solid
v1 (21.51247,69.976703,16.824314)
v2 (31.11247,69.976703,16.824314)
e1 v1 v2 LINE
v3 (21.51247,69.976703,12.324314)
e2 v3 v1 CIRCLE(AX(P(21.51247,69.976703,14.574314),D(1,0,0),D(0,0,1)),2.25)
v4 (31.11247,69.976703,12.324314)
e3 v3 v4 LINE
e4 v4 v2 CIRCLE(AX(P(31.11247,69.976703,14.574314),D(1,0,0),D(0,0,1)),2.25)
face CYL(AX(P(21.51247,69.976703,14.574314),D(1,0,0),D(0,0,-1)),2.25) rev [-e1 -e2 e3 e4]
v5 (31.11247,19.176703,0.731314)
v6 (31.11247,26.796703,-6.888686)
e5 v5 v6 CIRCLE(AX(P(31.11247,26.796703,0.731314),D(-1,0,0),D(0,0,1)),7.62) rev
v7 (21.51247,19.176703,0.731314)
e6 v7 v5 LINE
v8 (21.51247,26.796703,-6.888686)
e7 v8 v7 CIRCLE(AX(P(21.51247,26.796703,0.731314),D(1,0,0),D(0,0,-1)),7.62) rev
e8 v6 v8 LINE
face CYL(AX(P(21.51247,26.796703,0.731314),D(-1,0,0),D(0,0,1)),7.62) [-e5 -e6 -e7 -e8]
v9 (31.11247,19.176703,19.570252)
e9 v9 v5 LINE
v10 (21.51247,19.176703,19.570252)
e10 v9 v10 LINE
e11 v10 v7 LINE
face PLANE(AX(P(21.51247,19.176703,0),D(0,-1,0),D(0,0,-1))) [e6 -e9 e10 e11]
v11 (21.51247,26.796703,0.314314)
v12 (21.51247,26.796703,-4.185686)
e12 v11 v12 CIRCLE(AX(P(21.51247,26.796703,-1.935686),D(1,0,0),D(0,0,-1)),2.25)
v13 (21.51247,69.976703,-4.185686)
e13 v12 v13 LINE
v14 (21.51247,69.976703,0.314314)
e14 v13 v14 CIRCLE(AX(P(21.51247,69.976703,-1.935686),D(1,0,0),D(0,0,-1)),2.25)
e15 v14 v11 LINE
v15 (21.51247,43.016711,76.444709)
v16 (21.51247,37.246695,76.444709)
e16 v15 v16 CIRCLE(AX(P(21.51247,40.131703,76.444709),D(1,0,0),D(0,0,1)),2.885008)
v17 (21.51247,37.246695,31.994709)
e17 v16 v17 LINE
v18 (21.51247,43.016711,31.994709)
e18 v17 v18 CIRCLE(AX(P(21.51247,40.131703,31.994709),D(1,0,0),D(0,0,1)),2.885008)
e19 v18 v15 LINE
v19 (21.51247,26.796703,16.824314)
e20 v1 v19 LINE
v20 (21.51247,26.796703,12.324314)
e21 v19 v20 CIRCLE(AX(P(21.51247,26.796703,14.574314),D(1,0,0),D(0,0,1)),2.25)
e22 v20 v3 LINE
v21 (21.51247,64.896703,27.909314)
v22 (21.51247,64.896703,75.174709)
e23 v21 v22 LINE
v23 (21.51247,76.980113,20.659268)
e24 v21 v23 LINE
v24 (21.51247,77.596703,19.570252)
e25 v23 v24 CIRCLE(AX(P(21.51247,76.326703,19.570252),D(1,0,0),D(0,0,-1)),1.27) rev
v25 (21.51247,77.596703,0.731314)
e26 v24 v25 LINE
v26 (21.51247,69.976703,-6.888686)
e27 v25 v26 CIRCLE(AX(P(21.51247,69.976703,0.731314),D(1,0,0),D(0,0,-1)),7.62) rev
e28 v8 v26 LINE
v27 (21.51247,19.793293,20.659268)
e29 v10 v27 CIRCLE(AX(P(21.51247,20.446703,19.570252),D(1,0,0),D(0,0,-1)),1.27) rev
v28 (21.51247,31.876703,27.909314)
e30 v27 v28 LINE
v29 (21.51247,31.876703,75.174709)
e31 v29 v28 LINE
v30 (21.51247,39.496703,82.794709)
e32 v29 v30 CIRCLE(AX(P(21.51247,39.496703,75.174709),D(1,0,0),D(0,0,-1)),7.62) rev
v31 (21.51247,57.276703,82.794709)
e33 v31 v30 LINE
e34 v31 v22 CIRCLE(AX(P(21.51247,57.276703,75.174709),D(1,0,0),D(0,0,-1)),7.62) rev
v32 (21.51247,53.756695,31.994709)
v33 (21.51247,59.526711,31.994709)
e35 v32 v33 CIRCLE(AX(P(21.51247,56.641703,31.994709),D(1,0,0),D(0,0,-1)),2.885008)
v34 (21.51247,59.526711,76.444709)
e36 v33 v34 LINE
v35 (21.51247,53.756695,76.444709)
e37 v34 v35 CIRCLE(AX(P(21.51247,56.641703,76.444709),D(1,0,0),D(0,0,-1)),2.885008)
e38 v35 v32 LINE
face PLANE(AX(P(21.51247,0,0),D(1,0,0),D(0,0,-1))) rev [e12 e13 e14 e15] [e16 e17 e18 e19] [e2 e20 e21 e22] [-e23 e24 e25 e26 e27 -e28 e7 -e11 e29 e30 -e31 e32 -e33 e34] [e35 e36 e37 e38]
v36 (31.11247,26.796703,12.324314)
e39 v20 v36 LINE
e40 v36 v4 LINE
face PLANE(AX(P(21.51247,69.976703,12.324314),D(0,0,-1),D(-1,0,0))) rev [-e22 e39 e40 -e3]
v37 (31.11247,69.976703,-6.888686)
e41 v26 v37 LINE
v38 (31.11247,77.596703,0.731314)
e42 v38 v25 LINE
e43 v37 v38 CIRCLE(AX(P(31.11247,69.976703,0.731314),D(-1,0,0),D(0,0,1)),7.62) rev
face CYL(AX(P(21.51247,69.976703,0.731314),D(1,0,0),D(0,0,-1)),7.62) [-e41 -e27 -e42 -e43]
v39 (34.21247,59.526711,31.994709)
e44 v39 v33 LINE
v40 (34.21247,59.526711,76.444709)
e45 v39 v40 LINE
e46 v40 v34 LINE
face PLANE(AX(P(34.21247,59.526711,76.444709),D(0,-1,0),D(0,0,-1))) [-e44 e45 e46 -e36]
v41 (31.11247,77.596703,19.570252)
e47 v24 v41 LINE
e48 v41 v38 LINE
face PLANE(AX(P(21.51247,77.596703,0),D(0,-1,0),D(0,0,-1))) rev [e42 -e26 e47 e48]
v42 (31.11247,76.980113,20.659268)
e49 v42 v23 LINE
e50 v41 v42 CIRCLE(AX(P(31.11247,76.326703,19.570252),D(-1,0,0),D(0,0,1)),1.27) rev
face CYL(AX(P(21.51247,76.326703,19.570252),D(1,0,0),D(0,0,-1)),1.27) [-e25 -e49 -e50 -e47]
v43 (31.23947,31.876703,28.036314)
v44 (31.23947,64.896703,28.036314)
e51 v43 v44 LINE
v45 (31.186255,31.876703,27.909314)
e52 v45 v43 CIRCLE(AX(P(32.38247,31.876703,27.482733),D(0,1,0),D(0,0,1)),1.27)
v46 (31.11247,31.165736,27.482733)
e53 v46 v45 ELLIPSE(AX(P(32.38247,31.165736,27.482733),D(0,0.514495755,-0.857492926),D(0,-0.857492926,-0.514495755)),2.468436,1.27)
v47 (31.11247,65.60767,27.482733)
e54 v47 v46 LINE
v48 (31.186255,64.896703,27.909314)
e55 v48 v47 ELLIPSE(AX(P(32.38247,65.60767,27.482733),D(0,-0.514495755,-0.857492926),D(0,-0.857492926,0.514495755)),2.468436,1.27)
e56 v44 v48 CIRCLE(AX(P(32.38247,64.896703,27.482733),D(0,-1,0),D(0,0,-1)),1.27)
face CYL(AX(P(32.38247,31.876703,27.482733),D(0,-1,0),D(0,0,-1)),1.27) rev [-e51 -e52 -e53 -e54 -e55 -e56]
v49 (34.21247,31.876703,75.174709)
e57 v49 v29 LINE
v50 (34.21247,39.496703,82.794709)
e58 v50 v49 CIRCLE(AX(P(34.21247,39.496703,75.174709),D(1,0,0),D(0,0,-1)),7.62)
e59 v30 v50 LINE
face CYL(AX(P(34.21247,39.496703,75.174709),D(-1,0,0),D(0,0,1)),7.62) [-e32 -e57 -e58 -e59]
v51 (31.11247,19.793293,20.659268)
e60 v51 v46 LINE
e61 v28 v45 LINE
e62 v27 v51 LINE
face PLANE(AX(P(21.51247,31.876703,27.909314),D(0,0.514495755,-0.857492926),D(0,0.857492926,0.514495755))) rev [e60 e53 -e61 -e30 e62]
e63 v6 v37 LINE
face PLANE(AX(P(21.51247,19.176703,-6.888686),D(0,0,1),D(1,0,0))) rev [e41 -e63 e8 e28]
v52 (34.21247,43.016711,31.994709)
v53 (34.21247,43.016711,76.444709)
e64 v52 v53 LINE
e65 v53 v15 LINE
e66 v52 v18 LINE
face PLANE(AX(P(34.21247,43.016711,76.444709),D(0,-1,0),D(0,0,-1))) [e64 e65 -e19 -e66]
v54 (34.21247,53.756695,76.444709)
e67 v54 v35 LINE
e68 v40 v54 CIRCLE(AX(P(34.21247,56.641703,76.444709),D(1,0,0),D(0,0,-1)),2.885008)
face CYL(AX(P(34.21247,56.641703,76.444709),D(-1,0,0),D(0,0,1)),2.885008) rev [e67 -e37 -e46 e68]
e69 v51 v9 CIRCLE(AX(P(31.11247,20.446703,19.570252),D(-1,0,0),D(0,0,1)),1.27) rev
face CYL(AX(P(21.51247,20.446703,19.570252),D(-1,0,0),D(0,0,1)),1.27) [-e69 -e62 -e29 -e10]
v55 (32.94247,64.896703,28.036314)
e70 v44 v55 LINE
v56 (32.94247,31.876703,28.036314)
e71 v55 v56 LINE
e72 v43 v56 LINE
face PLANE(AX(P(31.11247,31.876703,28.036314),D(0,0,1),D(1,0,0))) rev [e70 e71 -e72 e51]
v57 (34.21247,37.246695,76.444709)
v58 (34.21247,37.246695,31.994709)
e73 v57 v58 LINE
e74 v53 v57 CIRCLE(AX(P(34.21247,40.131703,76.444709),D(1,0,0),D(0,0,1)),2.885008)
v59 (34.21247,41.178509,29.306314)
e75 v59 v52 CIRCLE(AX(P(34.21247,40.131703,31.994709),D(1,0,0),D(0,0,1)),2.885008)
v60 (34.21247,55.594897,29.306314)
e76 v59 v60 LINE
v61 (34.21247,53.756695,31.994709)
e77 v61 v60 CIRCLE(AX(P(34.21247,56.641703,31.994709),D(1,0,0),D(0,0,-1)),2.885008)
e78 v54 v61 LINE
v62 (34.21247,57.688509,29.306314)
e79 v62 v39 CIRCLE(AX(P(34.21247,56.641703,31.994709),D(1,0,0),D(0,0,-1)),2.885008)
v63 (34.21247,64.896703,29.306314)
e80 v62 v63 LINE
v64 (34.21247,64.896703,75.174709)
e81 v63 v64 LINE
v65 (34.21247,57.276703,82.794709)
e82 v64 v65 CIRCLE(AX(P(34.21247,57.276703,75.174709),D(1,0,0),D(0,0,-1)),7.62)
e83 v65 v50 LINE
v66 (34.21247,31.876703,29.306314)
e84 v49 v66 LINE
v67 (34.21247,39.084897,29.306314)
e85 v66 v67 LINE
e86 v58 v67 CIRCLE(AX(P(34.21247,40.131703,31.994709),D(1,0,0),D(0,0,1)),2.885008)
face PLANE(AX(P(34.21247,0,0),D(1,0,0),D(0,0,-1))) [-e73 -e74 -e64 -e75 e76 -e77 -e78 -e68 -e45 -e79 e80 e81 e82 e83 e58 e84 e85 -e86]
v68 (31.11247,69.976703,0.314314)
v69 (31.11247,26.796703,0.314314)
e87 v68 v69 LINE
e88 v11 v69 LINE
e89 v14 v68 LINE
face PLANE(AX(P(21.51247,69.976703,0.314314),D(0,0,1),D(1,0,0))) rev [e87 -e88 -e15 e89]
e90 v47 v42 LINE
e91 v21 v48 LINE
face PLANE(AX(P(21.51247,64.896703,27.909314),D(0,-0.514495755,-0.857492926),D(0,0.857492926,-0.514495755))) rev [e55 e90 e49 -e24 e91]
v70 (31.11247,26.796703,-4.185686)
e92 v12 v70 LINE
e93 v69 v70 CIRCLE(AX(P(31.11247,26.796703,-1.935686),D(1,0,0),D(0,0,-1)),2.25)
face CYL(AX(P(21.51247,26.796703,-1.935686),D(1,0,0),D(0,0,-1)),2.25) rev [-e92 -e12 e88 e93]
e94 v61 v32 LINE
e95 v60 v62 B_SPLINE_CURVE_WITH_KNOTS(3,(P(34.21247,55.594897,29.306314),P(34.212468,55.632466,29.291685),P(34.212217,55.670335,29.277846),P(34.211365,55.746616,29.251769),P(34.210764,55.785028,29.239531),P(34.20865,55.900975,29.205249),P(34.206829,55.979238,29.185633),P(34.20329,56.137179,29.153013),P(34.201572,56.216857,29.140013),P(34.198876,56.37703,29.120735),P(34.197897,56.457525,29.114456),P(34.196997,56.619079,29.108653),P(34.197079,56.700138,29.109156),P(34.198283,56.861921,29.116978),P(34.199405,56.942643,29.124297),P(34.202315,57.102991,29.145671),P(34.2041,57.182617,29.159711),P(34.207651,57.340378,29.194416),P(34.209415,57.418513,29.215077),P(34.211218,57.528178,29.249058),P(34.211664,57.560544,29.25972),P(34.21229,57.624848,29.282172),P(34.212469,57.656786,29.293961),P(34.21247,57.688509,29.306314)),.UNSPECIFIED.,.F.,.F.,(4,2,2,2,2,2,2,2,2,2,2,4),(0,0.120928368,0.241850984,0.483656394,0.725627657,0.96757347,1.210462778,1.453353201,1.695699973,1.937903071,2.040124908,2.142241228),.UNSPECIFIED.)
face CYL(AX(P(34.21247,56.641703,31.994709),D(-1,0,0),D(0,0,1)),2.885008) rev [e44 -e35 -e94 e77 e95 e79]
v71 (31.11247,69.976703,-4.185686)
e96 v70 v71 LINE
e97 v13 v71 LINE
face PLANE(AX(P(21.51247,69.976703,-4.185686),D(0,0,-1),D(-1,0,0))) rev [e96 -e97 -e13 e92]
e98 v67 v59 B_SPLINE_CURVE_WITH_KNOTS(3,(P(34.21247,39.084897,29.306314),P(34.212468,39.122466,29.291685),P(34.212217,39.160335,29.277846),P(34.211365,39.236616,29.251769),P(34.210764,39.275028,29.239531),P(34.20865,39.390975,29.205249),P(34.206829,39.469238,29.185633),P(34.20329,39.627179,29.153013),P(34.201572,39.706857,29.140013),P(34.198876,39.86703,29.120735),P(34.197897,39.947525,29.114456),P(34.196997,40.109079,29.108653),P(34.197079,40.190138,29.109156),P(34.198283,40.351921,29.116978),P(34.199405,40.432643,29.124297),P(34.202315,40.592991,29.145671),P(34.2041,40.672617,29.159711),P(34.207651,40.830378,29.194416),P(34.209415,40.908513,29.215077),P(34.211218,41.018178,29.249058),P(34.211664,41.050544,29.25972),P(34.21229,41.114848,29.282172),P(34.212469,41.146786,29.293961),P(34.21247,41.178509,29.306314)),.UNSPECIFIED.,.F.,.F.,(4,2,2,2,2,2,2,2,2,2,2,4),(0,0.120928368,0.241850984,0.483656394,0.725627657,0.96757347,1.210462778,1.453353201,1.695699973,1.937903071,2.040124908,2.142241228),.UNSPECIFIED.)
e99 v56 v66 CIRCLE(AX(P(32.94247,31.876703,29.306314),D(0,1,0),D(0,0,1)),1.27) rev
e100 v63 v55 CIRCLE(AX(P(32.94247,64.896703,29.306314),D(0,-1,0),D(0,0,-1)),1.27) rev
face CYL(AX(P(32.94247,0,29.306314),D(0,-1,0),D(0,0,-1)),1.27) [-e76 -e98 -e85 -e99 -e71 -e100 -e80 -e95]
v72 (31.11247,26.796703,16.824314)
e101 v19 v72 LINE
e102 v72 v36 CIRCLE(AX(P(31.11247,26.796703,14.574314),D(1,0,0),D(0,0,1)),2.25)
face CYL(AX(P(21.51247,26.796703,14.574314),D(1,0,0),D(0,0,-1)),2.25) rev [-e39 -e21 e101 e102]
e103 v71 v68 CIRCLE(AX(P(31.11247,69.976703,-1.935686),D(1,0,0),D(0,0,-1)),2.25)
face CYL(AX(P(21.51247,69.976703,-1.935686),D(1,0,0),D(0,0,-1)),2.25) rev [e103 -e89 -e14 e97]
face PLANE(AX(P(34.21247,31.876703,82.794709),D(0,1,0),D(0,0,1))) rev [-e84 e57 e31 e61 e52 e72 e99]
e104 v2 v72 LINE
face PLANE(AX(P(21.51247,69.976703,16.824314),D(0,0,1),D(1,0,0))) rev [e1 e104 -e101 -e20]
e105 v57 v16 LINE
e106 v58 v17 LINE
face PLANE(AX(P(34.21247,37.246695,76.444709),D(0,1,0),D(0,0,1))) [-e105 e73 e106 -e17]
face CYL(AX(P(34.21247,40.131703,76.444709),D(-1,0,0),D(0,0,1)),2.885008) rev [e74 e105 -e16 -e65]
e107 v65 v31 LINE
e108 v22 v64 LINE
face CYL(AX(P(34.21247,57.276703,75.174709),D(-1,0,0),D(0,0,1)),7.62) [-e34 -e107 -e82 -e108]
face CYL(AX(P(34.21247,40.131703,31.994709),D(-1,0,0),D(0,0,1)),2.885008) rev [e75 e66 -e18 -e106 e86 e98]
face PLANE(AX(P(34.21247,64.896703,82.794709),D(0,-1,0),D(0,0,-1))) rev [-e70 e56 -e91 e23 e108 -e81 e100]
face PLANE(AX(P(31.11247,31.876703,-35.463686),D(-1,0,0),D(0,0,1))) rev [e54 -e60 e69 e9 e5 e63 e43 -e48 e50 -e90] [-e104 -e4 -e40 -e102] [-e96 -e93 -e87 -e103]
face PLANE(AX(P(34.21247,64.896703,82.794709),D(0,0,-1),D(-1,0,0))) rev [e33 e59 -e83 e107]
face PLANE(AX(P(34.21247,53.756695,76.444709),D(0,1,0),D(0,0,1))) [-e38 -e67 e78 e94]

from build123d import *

# Parameters (mm, degrees)
SKETCH1_W           = 118.258395199
SKETCH1_H           = 33.02
BOSS_EXTRUDE1_DEPTH = 12.7
SKETCH2_W           = 3.1
SKETCH2_H           = 63.5
CUT_EXTRUDE1_DEPTH  = 96.476579779
CHAMFER1_SIZE       = 0.127
SKETCH5_W           = 63.373
SKETCH5_H           = 12.7
BOSS_EXTRUDE2_DEPTH = 9.6
CUT_EXTRUDE2_DEPTH  = 114.878760659
SKETCH4_W           = 10.16
SKETCH4_H           = 28.575
CUT_EXTRUDE3_DEPTH  = 107.95023743
CUT_EXTRUDE4_DEPTH  = 114.878760659
FILLET1_R           = 7.62
FILLET2_R           = 1.27


with BuildPart() as part:
    # Sketch1 → Boss-Extrude1 (new body)
    with BuildSketch(Plane(origin=(21.512469627, 0, 0), x_dir=(0, 0, -1), z_dir=(1, 0, 0))):
        with Locations((-23.66551122, 48.386703028)):
            Rectangle(SKETCH1_W, SKETCH1_H)
        with BuildLine():
            Line((-76.444708819, 59.526711228), (-31.994708819, 59.526711228))
            ThreePointArc((-31.994708819, 59.526711228), (-29.109700619, 56.641703028), (-31.994708819, 53.756694828))
            Line((-31.994708819, 53.756694828), (-76.444708819, 53.756694828))
            ThreePointArc((-76.444708819, 53.756694828), (-79.329717019, 56.641703028), (-76.444708819, 59.526711228))
        make_face(mode=Mode.SUBTRACT)
        with BuildLine():
            Line((-76.444708819, 37.246694828), (-31.994708819, 37.246694828))
            ThreePointArc((-31.994708819, 37.246694828), (-29.109700619, 40.131703028), (-31.994708819, 43.016711228))
            Line((-31.994708819, 43.016711228), (-76.444708819, 43.016711228))
            ThreePointArc((-76.444708819, 43.016711228), (-79.329717019, 40.131703028), (-76.444708819, 37.246694828))
        make_face(mode=Mode.SUBTRACT)
    extrude(amount=BOSS_EXTRUDE1_DEPTH)

    # Sketch2 → Cut-Extrude1 (cut, through all)
    with BuildSketch(Plane(origin=(0, 64.896703028, 0), x_dir=(1, 0, 0), z_dir=(0, 1, 0))):
        with Locations((32.662469627, 3.71368638)):
            Rectangle(SKETCH2_W, SKETCH2_H)
    extrude(amount=-CUT_EXTRUDE1_DEPTH, mode=Mode.SUBTRACT)

    # Chamfer1
    chamfer1_edges = [part.edges().sort_by_distance(p)[0] for p in [
        (31.112469627, 48.386703028, 28.03631362),
    ]]
    chamfer(chamfer1_edges, length=CHAMFER1_SIZE)

    # Sketch5 → Boss-Extrude2 (add)
    with BuildSketch(Plane(origin=(31.112469627, 0, 0), x_dir=(0, 0, -1), z_dir=(1, 0, 0))):
        with Locations((3.77718638, 25.526703028)):
            Rectangle(SKETCH5_W, SKETCH5_H)
        with Locations((3.77718638, 71.246703028)):
            Rectangle(SKETCH5_W, SKETCH5_H)
    extrude(amount=-BOSS_EXTRUDE2_DEPTH)

    # Sketch3 → Cut-Extrude2 (cut, through all)
    with BuildSketch(Plane(origin=(31.112469627, 0, 0), x_dir=(0, 0, -1), z_dir=(1, 0, 0))):
        with BuildLine():
            Line((4.18568638, 69.976703028), (4.18568638, 26.796703028))
            ThreePointArc((4.18568638, 26.796703028), (1.93568638, 24.546703028), (-0.31431362, 26.796703028))
            Line((-0.31431362, 26.796703028), (-0.31431362, 69.976703028))
            ThreePointArc((-0.31431362, 69.976703028), (1.93568638, 72.226703028), (4.18568638, 69.976703028))
        make_face()
        with BuildLine():
            Line((-16.82431362, 69.976703028), (-16.82431362, 26.796703028))
            ThreePointArc((-16.82431362, 26.796703028), (-14.57431362, 24.546703028), (-12.32431362, 26.796703028))
            Line((-12.32431362, 26.796703028), (-12.32431362, 69.976703028))
            ThreePointArc((-12.32431362, 69.976703028), (-14.57431362, 72.226703028), (-16.82431362, 69.976703028))
        make_face()
    extrude(amount=-CUT_EXTRUDE2_DEPTH, mode=Mode.SUBTRACT)

    # Sketch4 → Cut-Extrude3 (cut, through all)
    with BuildSketch(Plane(origin=(0, 77.596703028, 0), x_dir=(1, 0, 0), z_dir=(0, 1, 0))):
        with Locations((26.592469627, 21.17618638)):
            Rectangle(SKETCH4_W, SKETCH4_H)
    extrude(amount=-CUT_EXTRUDE3_DEPTH, mode=Mode.SUBTRACT)

    # Sketch6 → Cut-Extrude4 (cut, through all)
    with BuildSketch(Plane(origin=(31.112469627, 0, 0), x_dir=(0, 0, -1), z_dir=(1, 0, 0))):
        Polygon((-27.90931362, 64.896703028), (-20.28931362, 77.596703028), (-27.90931362, 77.596703028), align=None)
        Polygon((-20.28931362, 19.176703028), (-27.90931362, 19.176703028), (-27.90931362, 31.876703028), align=None)
    extrude(amount=-CUT_EXTRUDE4_DEPTH, mode=Mode.SUBTRACT)

    # Fillet1
    fillet1_edges = [part.edges().sort_by_distance(p)[0] for p in [
        (26.312469627, 77.596703028, -6.88868638),
        (26.312469627, 19.176703028, -6.88868638),
        (27.862469627, 64.896703028, 82.794708819),
        (27.862469627, 31.876703028, 82.794708819),
    ]]
    fillet(fillet1_edges, radius=FILLET1_R)

    # Fillet2
    # the kernel refuses this fillet: 1.27 mm, written as the material it adds along each edge
    with BuildSketch(Plane(origin=(31.112469627, 65.963153443, 27.90931362), x_dir=(0.7071067811865475, 0, 0.7071067811865475), z_dir=(0, -1, 0))) as fillet2_piece_1_section:
        with BuildLine():
            CenterArc((0.596387884, -1.19966334), FILLET2_R, 109.158067237, 25.841932763)
            Line((-0.301637728, -0.301637728), (0, 0))
            Line((0, 0), (0.179605122, 0))
        make_face()
    fillet2_piece_1 = extrude(amount=35.152900829, mode=Mode.PRIVATE)
    fillet2_piece_1 = split(fillet2_piece_1, bisect_by=Plane(origin=(31.112469627, 65.680857745, 27.43882079), z_dir=(0, -0.5144957554275265, -0.8574929257125442)), keep=Keep.TOP, mode=Mode.PRIVATE)
    fillet2_piece_1 = split(fillet2_piece_1, bisect_by=Plane(origin=(31.112469627, 56.940269509, 42.947453509), z_dir=(0, 0.5144957554275265, -0.8574929257125442)), keep=Keep.TOP, mode=Mode.PRIVATE)
    add(fillet2_piece_1)
    with BuildSketch(Plane(origin=(31.112469627, 64.896703028, 27.90931362), x_dir=(0.7071067811865475, 0, 0.7071067811865475), z_dir=(0, -1, 0))) as fillet2_piece_2:
        with BuildLine():
            CenterArc((0.596387884, -1.19966334), FILLET2_R, 109.158067237, 25.841932763)
            Line((-0.301637728, -0.301637728), (0, 0))
            Line((0, 0), (0.179605122, 0))
        make_face()
    extrude(amount=33.02)
    # the kernel refuses this fillet: 1.27 mm, written as the material it takes off along each edge
    with BuildSketch(Plane(origin=(34.212469627, 68.071703028, 28.03631362), x_dir=(-1, 0, 0), z_dir=(0, -1, 0))) as fillet2_2_piece_1:
        with BuildLine():
            CenterArc((FILLET2_R, -FILLET2_R), FILLET2_R, 90, 90)
            Line((0, -FILLET2_R), (0, 0))
            Line((0, 0), (FILLET2_R, 0))
        make_face()
    extrude(amount=39.37, mode=Mode.SUBTRACT)
    with BuildSketch(Plane(origin=(32.91012408, 77.596703028, 20.28931362), x_dir=(0, 0, -1), z_dir=(-1, 0, 0)), Plane(origin=(32.91012408, 19.176703028, 20.28931362), x_dir=(0, 0.8574929257125441, 0.5144957554275265), z_dir=(-1, 0, 0))) as fillet2_2_piece_2:
        with BuildLine():
            CenterArc((FILLET2_R * 0.566190378969, FILLET2_R), FILLET2_R, 210.963756532, 59.036243468)
            Line((-FILLET2_R * 0.291302546743, FILLET2_R * 0.485504244572), (0, 0))
            Line((0, 0), (FILLET2_R * 0.566190378969, 0))
        make_face()
    extrude(amount=13.195308906, mode=Mode.SUBTRACT)


solid = part.part
